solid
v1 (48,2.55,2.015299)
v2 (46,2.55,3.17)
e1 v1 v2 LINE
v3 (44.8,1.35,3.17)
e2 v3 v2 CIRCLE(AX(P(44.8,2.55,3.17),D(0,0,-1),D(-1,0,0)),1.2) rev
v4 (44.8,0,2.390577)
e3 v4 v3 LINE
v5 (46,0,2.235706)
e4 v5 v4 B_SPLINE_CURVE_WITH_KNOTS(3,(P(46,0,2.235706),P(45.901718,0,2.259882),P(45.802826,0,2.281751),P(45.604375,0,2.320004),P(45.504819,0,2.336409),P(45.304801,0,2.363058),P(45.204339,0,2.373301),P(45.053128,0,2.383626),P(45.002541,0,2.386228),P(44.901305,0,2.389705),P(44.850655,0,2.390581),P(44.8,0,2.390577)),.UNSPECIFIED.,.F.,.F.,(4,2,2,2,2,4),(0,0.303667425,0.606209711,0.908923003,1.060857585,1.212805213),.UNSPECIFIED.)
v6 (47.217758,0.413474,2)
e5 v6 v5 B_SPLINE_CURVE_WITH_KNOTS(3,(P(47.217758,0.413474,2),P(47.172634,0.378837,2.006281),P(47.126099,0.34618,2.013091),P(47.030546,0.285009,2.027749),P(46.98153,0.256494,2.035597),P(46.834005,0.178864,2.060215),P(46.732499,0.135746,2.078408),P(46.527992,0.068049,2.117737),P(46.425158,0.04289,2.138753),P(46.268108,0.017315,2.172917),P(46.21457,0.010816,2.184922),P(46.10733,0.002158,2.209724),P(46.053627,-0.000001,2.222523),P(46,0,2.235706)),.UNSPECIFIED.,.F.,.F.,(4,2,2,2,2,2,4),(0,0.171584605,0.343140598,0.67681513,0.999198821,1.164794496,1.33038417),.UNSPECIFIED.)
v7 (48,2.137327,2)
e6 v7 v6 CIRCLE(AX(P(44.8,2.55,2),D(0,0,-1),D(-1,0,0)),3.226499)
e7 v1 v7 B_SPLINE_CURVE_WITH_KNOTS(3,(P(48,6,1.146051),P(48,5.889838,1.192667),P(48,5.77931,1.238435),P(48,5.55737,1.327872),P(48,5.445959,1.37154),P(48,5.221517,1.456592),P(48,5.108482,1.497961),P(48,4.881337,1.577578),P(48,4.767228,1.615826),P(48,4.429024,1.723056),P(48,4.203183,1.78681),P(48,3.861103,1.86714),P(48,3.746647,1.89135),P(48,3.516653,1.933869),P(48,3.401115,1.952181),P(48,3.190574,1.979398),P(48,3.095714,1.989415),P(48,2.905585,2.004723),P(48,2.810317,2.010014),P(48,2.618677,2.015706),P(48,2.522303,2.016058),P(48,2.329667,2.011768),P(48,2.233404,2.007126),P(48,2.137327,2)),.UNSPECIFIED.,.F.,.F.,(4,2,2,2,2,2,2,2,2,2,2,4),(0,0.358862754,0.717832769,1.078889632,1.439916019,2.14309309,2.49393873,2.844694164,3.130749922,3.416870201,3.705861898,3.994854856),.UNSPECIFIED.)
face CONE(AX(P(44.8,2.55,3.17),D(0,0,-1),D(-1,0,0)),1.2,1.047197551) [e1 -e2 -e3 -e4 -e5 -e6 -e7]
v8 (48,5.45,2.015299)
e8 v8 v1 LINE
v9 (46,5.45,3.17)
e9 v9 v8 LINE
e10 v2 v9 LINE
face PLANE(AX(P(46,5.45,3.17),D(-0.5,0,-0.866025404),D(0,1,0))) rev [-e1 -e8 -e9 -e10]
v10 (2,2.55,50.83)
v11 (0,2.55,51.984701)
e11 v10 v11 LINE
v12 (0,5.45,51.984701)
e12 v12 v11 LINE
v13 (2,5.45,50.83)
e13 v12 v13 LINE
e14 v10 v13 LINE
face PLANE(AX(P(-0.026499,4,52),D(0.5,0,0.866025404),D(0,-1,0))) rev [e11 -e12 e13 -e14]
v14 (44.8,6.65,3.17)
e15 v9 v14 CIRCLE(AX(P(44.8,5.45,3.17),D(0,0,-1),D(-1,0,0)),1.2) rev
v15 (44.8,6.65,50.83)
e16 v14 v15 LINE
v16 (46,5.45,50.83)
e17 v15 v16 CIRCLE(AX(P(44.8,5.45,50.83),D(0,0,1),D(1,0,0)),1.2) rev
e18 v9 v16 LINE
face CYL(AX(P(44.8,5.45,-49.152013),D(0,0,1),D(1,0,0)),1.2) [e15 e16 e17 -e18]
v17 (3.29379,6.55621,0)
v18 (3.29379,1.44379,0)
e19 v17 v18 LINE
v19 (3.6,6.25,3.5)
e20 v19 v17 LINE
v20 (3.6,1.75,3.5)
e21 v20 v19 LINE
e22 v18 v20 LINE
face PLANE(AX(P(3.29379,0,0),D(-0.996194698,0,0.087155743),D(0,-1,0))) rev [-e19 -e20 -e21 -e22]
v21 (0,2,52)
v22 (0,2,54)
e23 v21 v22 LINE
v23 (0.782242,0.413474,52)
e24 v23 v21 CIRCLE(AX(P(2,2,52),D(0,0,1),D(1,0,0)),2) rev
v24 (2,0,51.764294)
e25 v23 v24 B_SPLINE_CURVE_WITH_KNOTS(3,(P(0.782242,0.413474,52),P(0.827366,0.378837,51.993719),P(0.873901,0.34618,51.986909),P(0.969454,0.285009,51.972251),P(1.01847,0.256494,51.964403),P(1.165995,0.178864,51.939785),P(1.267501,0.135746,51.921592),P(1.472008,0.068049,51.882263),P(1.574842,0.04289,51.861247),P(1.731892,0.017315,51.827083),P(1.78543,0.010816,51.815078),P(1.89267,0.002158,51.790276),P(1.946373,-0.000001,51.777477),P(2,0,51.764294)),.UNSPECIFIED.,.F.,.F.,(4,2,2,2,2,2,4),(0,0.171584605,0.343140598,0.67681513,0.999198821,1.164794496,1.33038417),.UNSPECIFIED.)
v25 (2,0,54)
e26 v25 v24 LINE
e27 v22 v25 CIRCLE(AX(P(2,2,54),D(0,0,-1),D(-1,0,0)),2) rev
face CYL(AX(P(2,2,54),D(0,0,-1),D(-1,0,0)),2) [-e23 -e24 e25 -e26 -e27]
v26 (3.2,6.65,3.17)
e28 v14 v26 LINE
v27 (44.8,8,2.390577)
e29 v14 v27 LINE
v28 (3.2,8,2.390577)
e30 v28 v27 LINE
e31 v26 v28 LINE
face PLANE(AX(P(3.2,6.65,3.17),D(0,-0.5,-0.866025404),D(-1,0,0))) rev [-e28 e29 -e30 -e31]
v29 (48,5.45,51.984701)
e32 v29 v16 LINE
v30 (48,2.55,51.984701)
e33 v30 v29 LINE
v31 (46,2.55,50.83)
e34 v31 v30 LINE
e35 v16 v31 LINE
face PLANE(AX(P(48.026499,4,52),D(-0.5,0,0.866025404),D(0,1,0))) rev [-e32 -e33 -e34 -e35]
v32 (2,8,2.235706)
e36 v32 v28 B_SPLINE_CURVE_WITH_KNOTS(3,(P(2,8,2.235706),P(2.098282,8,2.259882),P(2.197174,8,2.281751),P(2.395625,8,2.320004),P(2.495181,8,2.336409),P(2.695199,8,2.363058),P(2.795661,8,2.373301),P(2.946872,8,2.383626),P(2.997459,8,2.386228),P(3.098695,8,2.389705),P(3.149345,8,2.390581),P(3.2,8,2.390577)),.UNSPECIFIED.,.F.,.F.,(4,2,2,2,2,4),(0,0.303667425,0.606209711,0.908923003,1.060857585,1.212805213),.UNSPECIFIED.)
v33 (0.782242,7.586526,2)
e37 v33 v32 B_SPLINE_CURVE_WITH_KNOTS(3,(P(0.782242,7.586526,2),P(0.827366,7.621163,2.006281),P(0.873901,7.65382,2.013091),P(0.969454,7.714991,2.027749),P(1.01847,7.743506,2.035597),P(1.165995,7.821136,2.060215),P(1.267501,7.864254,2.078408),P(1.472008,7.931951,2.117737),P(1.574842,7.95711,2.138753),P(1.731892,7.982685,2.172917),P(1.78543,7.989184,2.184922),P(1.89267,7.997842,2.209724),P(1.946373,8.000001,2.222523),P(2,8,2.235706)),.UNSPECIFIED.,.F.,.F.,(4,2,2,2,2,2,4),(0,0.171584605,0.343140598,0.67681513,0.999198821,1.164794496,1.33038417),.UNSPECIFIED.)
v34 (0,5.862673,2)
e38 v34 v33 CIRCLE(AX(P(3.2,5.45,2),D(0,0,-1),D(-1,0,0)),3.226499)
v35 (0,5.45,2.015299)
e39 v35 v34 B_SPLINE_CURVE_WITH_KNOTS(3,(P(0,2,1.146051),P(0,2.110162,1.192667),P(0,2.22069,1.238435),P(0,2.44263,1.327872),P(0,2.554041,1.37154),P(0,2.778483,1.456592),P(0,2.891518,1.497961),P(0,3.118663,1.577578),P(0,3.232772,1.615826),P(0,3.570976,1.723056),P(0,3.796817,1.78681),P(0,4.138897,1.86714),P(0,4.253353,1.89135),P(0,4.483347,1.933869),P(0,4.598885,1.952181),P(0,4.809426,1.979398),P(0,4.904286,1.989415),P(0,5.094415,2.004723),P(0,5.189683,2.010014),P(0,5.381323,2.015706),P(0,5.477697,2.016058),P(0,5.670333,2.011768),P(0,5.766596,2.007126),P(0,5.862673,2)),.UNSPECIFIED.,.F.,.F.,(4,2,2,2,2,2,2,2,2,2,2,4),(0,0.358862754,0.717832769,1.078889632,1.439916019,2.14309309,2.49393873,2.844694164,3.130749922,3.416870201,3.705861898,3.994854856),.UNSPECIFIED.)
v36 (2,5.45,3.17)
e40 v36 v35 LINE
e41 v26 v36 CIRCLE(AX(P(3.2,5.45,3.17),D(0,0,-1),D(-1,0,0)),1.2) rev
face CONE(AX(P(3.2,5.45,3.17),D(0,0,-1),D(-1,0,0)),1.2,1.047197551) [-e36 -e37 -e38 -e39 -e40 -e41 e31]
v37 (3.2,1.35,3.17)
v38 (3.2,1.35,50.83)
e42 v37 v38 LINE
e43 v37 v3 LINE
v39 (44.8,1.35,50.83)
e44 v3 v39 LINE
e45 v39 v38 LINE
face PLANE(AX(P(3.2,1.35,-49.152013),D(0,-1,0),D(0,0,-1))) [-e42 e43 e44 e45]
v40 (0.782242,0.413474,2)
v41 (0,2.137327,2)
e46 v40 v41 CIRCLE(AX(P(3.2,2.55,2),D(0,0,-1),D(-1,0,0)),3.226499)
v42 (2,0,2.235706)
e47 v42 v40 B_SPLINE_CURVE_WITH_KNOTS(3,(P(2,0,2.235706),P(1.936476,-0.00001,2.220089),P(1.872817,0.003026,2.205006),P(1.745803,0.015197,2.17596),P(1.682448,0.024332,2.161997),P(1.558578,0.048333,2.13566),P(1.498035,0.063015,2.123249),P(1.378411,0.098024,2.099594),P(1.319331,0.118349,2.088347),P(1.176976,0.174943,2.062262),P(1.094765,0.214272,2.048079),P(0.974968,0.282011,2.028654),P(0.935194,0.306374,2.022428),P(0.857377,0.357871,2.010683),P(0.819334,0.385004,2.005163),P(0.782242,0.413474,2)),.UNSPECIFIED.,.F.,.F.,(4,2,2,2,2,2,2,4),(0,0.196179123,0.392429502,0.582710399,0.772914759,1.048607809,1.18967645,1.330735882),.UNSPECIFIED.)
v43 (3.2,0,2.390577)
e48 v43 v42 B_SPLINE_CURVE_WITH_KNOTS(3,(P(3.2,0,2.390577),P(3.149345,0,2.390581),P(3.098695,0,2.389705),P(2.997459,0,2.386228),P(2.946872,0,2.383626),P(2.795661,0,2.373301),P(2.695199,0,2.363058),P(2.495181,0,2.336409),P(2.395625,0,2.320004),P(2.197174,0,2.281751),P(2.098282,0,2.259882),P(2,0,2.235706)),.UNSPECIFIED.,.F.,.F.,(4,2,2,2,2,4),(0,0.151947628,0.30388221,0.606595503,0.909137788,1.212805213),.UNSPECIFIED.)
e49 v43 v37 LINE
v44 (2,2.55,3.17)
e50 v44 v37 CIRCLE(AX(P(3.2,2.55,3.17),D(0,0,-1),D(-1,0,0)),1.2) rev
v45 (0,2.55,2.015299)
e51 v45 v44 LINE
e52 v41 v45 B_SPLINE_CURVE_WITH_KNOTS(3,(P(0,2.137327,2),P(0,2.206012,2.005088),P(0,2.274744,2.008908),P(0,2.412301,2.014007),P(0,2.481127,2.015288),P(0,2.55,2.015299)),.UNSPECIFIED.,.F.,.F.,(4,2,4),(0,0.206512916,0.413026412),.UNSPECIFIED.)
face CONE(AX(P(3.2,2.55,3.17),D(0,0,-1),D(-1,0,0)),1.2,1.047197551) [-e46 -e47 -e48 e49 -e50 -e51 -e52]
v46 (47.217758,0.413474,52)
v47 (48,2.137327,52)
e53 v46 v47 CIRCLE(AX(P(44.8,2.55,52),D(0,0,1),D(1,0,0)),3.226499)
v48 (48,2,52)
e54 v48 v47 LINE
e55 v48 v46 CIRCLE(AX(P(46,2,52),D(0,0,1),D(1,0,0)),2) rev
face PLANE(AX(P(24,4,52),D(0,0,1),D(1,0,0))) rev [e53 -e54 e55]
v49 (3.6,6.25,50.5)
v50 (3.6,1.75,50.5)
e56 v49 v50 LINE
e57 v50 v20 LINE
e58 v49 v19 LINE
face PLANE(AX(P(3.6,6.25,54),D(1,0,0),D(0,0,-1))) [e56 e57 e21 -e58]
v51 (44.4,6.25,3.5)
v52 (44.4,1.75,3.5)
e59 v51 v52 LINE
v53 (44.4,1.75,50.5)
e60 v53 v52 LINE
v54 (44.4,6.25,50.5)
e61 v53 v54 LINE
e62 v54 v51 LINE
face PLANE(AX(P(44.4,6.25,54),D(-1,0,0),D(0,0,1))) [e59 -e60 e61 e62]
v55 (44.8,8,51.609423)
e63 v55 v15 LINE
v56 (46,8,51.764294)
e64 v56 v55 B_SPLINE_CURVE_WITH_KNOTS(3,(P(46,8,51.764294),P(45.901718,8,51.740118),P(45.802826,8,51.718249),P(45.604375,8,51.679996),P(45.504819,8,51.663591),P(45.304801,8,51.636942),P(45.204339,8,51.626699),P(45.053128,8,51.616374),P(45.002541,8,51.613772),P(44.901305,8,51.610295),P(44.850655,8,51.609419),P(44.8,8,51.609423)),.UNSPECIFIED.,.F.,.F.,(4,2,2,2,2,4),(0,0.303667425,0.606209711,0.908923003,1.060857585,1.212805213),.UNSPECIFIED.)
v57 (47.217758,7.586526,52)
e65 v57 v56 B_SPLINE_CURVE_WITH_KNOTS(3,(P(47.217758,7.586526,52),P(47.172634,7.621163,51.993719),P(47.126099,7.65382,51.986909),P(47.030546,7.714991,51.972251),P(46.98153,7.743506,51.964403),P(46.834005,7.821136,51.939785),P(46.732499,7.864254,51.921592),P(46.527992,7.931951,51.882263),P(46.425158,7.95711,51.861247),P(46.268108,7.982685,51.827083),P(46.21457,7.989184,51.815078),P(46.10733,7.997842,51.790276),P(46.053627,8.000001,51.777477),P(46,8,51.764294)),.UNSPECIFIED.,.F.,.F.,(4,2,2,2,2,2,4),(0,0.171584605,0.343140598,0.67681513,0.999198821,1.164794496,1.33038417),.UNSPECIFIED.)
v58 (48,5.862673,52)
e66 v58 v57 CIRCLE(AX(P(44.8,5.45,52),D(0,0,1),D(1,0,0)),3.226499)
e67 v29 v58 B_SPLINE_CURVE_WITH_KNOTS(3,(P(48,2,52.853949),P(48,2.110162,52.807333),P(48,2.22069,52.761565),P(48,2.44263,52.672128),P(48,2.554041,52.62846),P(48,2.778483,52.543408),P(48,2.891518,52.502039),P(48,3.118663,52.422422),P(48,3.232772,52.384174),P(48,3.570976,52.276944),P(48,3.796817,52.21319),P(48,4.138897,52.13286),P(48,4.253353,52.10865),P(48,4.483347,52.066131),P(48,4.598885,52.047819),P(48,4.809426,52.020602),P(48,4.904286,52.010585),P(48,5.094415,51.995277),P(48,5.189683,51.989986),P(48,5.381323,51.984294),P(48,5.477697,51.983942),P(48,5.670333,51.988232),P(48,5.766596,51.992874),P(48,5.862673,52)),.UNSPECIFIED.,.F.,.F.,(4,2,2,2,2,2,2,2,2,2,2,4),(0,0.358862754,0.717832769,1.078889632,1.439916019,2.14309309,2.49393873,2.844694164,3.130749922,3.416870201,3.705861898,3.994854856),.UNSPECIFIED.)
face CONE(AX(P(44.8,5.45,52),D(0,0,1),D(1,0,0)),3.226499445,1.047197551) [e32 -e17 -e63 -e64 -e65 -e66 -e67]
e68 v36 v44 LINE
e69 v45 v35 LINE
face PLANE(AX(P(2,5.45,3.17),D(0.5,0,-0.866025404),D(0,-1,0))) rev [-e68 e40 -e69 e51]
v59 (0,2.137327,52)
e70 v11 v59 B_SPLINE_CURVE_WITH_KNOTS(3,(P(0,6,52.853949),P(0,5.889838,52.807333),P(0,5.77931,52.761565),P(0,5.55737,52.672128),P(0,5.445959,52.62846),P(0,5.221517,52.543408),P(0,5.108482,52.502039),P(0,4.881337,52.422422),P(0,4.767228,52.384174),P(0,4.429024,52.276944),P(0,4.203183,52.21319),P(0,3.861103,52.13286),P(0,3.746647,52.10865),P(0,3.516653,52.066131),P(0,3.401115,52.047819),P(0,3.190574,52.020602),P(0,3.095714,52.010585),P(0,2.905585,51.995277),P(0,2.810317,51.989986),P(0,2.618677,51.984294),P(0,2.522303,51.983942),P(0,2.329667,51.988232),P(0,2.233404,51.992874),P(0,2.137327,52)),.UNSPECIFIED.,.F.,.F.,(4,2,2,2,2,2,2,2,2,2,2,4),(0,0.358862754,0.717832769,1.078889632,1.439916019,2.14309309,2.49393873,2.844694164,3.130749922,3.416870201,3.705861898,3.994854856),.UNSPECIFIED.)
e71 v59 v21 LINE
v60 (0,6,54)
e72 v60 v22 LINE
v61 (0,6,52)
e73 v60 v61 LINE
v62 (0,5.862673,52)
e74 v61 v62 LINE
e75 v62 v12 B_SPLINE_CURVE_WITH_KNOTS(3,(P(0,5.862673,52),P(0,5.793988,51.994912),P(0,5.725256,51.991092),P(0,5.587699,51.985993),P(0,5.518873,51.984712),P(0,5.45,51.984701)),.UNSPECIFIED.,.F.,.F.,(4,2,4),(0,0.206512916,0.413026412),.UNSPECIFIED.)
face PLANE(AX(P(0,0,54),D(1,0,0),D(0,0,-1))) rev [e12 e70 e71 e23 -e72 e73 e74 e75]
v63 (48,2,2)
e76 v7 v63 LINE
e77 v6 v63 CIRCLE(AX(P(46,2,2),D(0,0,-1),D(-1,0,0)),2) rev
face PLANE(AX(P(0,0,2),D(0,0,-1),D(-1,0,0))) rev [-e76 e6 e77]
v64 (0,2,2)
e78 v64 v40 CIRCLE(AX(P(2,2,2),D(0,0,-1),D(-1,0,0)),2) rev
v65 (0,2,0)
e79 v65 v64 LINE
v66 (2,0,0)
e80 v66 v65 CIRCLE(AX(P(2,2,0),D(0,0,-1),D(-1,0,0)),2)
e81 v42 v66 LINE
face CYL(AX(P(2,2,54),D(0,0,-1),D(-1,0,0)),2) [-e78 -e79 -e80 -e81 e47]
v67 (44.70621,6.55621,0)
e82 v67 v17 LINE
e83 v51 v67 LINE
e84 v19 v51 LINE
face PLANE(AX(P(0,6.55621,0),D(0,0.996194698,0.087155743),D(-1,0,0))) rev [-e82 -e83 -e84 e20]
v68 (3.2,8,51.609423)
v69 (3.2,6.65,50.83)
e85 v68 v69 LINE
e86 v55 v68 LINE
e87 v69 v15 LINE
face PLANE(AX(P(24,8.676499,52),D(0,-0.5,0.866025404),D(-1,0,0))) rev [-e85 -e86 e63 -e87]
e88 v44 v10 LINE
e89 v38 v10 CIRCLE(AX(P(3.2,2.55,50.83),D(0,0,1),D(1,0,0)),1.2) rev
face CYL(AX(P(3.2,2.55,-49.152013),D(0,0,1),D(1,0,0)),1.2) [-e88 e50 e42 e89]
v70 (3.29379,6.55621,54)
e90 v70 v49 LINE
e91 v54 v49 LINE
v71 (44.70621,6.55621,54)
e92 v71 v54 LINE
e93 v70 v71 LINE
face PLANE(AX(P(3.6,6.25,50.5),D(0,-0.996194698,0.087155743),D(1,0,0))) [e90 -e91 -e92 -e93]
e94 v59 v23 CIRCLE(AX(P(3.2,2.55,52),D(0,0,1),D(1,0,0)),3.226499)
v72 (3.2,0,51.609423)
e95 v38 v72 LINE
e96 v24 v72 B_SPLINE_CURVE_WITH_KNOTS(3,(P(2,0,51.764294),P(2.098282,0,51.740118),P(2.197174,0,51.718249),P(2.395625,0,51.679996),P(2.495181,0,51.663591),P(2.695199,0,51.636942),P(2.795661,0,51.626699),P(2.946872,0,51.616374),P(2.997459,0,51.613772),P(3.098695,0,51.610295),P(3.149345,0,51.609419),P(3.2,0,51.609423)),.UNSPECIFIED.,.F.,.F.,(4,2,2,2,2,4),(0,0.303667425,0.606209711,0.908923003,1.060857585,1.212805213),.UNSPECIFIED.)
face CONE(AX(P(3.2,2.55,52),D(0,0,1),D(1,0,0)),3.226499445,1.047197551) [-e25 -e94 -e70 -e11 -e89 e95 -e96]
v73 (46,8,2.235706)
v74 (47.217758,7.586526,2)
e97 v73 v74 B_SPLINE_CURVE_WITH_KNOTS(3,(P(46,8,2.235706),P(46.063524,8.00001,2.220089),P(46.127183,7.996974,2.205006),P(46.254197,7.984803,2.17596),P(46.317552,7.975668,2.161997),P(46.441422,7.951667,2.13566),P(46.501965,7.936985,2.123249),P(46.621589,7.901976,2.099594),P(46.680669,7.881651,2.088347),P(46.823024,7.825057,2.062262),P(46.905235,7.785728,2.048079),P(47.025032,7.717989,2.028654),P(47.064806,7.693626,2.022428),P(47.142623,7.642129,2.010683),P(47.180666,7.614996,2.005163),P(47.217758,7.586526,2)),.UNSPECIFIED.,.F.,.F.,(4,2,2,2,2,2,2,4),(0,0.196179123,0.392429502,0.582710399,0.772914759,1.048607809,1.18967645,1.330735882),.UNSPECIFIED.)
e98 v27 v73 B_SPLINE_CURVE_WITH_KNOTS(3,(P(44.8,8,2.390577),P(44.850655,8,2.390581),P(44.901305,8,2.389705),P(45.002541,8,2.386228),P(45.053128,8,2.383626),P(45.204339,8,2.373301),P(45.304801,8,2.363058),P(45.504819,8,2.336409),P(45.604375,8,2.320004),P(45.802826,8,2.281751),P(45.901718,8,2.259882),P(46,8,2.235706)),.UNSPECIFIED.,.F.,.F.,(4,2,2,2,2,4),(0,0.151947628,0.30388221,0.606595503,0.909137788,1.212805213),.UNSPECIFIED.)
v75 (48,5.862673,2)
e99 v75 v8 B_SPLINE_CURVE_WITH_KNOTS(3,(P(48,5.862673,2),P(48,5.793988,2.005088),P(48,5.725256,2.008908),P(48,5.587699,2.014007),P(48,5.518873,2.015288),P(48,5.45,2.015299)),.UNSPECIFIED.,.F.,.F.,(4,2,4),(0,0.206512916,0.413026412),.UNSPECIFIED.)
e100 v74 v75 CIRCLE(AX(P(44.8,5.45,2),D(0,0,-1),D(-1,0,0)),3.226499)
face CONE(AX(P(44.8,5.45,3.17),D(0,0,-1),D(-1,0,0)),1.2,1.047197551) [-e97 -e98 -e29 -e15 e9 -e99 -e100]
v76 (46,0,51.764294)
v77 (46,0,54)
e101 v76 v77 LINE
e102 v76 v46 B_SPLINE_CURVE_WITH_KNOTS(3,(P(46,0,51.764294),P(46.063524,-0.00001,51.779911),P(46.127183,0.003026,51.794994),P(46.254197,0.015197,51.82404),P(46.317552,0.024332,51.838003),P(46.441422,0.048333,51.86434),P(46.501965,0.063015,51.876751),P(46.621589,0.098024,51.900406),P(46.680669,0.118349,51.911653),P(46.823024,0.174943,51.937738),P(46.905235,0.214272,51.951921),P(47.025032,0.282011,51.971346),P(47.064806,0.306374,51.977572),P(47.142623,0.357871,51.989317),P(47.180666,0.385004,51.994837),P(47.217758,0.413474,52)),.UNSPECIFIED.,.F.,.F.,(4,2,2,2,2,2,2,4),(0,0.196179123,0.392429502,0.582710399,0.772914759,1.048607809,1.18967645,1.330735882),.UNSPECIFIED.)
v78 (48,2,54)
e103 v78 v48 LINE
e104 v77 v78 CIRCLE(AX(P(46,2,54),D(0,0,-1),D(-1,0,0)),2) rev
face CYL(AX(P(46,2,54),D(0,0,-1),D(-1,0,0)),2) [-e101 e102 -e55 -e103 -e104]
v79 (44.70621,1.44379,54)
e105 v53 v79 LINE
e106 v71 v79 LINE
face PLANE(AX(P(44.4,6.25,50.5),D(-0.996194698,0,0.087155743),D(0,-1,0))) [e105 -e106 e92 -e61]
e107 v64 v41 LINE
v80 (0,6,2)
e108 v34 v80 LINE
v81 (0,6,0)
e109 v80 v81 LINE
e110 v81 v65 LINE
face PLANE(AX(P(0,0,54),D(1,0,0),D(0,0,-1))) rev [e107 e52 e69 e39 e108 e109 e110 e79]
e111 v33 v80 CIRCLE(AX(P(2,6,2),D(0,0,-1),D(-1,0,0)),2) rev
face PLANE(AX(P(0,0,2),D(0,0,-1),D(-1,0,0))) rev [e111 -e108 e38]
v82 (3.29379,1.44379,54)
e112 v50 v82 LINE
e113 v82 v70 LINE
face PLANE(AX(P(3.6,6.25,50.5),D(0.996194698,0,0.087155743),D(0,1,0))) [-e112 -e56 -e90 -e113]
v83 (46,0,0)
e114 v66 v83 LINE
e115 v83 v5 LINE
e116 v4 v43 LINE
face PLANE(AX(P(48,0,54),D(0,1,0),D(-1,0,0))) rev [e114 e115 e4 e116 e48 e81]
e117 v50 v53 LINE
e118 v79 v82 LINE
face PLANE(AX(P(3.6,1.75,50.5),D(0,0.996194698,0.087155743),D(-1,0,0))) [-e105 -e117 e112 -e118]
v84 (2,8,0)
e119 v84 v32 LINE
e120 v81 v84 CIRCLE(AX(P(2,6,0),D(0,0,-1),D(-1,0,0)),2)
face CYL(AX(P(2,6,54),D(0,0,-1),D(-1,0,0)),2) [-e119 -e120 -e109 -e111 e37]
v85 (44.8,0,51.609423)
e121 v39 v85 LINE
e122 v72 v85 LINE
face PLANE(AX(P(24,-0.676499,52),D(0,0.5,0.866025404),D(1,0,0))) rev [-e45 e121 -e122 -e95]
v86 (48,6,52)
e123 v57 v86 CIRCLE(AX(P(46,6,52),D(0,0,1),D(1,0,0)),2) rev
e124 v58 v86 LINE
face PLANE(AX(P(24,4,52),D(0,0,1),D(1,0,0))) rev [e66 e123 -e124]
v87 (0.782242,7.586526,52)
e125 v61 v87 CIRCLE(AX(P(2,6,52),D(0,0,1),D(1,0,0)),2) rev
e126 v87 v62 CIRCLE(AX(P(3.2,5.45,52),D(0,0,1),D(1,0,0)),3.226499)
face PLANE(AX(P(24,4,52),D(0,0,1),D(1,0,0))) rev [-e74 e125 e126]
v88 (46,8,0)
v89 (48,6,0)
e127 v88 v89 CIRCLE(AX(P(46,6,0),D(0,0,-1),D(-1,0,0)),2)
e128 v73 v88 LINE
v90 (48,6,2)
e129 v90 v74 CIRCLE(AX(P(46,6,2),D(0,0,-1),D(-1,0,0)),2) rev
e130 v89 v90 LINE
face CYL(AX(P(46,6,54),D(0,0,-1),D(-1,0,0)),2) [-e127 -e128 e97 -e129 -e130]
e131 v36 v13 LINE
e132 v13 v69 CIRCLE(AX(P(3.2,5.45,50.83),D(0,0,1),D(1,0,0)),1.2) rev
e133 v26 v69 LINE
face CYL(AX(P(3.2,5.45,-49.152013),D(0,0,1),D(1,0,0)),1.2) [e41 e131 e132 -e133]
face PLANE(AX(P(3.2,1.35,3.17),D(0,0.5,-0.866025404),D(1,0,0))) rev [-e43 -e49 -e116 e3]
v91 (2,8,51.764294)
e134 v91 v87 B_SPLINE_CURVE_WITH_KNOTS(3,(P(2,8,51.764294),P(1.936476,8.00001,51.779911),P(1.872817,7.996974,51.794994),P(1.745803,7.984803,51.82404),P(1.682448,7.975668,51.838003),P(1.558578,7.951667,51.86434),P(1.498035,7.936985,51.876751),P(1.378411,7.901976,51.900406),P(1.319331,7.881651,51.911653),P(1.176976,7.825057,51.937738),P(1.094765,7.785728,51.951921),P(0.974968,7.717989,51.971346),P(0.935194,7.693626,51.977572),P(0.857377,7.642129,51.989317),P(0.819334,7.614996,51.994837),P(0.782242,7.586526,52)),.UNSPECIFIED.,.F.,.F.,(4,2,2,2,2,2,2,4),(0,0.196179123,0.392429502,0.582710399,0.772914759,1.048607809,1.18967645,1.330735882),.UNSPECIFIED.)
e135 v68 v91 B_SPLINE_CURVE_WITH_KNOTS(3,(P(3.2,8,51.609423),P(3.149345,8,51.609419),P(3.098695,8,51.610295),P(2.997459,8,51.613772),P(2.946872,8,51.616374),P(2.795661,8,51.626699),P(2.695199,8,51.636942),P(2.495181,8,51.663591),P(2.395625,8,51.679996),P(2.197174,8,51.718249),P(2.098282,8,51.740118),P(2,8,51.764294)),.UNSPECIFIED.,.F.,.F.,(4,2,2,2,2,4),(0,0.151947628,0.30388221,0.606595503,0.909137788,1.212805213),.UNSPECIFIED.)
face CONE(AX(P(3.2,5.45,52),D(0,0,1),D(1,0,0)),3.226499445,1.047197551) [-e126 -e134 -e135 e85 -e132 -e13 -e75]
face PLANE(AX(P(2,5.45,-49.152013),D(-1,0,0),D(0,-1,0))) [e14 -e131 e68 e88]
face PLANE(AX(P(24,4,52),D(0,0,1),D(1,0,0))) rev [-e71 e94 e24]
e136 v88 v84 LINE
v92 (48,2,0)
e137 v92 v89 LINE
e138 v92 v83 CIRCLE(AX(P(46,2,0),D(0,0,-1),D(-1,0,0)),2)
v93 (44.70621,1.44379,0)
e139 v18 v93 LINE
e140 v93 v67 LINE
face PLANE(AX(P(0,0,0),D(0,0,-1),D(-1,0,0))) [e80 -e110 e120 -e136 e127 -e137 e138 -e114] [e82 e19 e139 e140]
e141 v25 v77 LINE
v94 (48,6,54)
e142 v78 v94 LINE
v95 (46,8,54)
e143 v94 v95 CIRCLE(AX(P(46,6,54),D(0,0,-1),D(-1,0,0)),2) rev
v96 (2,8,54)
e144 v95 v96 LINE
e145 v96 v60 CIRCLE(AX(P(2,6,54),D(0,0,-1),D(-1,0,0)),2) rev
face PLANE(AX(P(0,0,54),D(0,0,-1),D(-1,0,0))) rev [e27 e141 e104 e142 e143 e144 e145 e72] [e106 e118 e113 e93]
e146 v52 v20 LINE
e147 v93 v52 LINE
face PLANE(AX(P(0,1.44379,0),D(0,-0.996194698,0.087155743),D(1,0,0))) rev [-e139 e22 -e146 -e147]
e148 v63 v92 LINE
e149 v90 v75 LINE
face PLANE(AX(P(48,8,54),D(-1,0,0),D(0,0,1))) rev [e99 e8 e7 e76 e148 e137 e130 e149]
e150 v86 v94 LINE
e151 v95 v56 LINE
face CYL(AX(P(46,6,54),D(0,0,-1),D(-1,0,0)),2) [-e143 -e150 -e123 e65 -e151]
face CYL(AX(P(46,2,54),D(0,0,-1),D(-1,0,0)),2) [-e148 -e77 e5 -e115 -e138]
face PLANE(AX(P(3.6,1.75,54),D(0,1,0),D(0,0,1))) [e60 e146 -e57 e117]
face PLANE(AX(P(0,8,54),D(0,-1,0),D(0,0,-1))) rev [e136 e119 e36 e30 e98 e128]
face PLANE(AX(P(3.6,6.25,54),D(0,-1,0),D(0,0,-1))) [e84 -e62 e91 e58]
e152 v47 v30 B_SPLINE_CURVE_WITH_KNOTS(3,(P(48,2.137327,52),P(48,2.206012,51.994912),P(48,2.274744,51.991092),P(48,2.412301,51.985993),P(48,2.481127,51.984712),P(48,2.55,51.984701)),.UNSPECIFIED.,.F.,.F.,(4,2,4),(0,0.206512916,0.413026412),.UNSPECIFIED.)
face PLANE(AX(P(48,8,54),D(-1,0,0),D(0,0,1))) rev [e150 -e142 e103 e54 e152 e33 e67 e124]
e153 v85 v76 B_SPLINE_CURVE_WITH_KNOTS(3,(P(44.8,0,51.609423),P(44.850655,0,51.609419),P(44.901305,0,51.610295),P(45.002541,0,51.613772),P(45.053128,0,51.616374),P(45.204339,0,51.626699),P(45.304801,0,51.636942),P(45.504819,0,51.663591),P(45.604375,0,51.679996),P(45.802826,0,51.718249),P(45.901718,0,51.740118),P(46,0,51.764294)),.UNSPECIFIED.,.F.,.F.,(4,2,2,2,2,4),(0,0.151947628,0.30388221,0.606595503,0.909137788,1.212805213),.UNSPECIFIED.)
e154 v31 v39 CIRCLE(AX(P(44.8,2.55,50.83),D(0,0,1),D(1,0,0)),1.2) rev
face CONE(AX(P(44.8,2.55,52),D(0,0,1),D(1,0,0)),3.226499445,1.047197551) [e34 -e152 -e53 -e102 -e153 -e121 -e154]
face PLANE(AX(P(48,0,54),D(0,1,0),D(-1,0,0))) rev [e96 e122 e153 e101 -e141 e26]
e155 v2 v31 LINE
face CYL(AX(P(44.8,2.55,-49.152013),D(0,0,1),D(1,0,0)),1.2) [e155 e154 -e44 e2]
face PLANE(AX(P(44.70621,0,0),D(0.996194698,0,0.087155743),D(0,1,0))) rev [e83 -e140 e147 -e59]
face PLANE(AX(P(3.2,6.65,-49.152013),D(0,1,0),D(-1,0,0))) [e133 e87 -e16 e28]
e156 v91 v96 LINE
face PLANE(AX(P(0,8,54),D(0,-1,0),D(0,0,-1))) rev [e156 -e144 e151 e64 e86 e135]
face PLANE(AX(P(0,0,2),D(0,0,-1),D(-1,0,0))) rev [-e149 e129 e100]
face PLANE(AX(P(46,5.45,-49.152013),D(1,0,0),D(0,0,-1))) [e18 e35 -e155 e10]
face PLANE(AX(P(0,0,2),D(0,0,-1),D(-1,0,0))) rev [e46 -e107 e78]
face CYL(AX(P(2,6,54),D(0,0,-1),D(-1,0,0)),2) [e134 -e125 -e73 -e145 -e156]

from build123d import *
from OCP.BRepFilletAPI import BRepFilletAPI_MakeChamfer

# Parameters (mm, degrees)
SKETCH1_W           = 48
SKETCH1_H           = 8
SKETCH1_W_2         = 40.8
SKETCH1_H_2         = 4.5
BOSS_EXTRUDE1_DEPTH = 54
CUT_EXTRUDE1_START  = -2
SKETCH2_OUTSIDE_W   = 64.538
SKETCH2_OUTSIDE_H   = 24.538
CUT_EXTRUDE1_DEPTH  = 50
FILLET1_R           = 2
CHAMFER4_SIZE       = 1.17
CHAMFER4_SIZE_2     = 2.026499445
CHAMFER5_SIZE       = 3.5
CHAMFER5_SIZE2      = 0.306210322


with BuildPart() as part:
    # Sketch1 → Boss-Extrude1 (new body)
    with BuildSketch(Plane.XY):
        with Locations((24, 4)):
            Rectangle(SKETCH1_W, SKETCH1_H)
        with Locations((24, 4)):
            Rectangle(SKETCH1_W_2, SKETCH1_H_2, mode=Mode.SUBTRACT)
    extrude(amount=BOSS_EXTRUDE1_DEPTH)

    # Sketch2 outside → Cut-Extrude1 (cut)
    with BuildSketch(Plane.XY.offset(54).offset(CUT_EXTRUDE1_START)):
        with Locations((24, 4)):
            Rectangle(SKETCH2_OUTSIDE_W, SKETCH2_OUTSIDE_H)
        with BuildLine():
            Line((3.2, 6.65), (44.8, 6.65))
            ThreePointArc((44.8, 6.65), (45.648528137, 6.298528137), (46, 5.45))
            Line((46, 5.45), (46, 2.55))
            ThreePointArc((46, 2.55), (45.648528137, 1.701471863), (44.8, 1.35))
            Line((44.8, 1.35), (3.2, 1.35))
            ThreePointArc((3.2, 1.35), (2.351471863, 1.701471863), (2, 2.55))
            Line((2, 2.55), (2, 5.45))
            ThreePointArc((2, 5.45), (2.351471863, 6.298528137), (3.2, 6.65))
        make_face(mode=Mode.SUBTRACT)
    extrude(amount=-CUT_EXTRUDE1_DEPTH, mode=Mode.SUBTRACT)

    # Fillet1
    fillet1_edges = [part.edges().sort_by_distance(p)[0] for p in [
        (48, 0, 1),
        (0, 0, 1),
        (0, 8, 1),
        (48, 8, 1),
        (48, 0, 53),
        (0, 0, 53),
        (0, 8, 53),
        (48, 8, 53),
    ]]
    fillet(fillet1_edges, radius=FILLET1_R)

    # Chamfer4
    # the kernel refuses this chamfer: 2.026499445, 1.17 mm, written as the material it adds along each edge
    with BuildSketch(Plane(origin=(2, 2.55, 52), x_dir=(0.05789386240267108, 0, -0.9983227437537927), z_dir=(0, 1, 0))) as chamfer4_piece_1_section:
        Polygon((CHAMFER4_SIZE * 0.998322743754, CHAMFER4_SIZE * 0.0578938624027), (-CHAMFER4_SIZE_2 * 0.0578938623985, CHAMFER4_SIZE_2 * 0.998322743683), (0, 0), align=None)
    chamfer4_piece_1 = extrude(amount=2.9, mode=Mode.PRIVATE)
    chamfer4_piece_1 = split(chamfer4_piece_1, bisect_by=Plane(origin=(0, 4, 51.609934173), z_dir=(1, 0, 0)), keep=Keep.TOP, mode=Mode.PRIVATE)
    add(chamfer4_piece_1)
    with BuildSketch(Plane(origin=(2, 2.55, 2), x_dir=(-0.999813220622208, 0, -0.019326765612700622), z_dir=(0, 1, 0))) as chamfer4_piece_2_section:
        Polygon((CHAMFER4_SIZE_2 * 0.999813220551, CHAMFER4_SIZE_2 * 0.0193267656113), (-CHAMFER4_SIZE * 0.0193267656127, CHAMFER4_SIZE * 0.999813220622), (0, 0), align=None)
    chamfer4_piece_2 = extrude(amount=2.9, mode=Mode.PRIVATE)
    chamfer4_piece_2 = split(chamfer4_piece_2, bisect_by=Plane(origin=(0, 4, 2.390065827), z_dir=(1, 0, 0)), keep=Keep.TOP, mode=Mode.PRIVATE)
    add(chamfer4_piece_2)
    with BuildSketch(Plane(origin=(3.2, 2.55, 52), x_dir=(0, -1, 0), z_dir=(1, 0, 0))) as chamfer4_piece_3_section:
        Polygon((1.2, CHAMFER4_SIZE), (1.2 + CHAMFER4_SIZE_2, 0), (1.2, 0), align=None)
    chamfer4_piece_3 = revolve(axis=Axis((3.2, 2.55, 52), (0, 0, -1)), revolution_arc=90, mode=Mode.PRIVATE)
    chamfer4_piece_3 = chamfer4_piece_3 & Plane(origin=(2, 2, 51.456530792), x_dir=(0, -1, 0), z_dir=(0, 0, 1)) * Cylinder(2, 13, mode=Mode.PRIVATE)
    add(chamfer4_piece_3)
    with BuildSketch(Plane(origin=(3.2, 2.55, 52), x_dir=(0, -1, 0), z_dir=(1, 0, 0))) as chamfer4_piece_4_section:
        Polygon((1.2, CHAMFER4_SIZE), (1.2 + CHAMFER4_SIZE_2, 0), (1.2, 0), align=None)
    chamfer4_piece_4 = revolve(axis=Axis((3.2, 2.55, 52), (0, 0, -1)), revolution_arc=90, mode=Mode.PRIVATE)
    chamfer4_piece_4 = split(chamfer4_piece_4, bisect_by=Plane(origin=(2, 0.130683468, 51.773765117), z_dir=(1, 0, 0)), keep=Keep.TOP, mode=Mode.PRIVATE)
    chamfer4_piece_4 = split(chamfer4_piece_4, bisect_by=Plane(origin=(2.932508476, 0, 51.773765117), z_dir=(0, 1, 0)), keep=Keep.TOP, mode=Mode.PRIVATE)
    add(chamfer4_piece_4)
    with BuildSketch(Plane(origin=(3.2, 2.55, 52), x_dir=(0, -1, 0), z_dir=(1, 0, 0))) as chamfer4_piece_5_section:
        Polygon((1.2, CHAMFER4_SIZE), (1.2 + CHAMFER4_SIZE_2, 0), (1.2, 0), align=None)
    chamfer4_piece_5 = revolve(axis=Axis((3.2, 2.55, 52), (0, 0, -1)), revolution_arc=90, mode=Mode.PRIVATE)
    chamfer4_piece_5 = split(chamfer4_piece_5, bisect_by=Plane(origin=(0.031272967, 1.35, 51.984062188), z_dir=(0, 1, 0)), keep=Keep.TOP, mode=Mode.PRIVATE)
    chamfer4_piece_5 = split(chamfer4_piece_5, bisect_by=Plane(origin=(0, 2.450571478, 51.984062188), z_dir=(1, 0, 0)), keep=Keep.TOP, mode=Mode.PRIVATE)
    add(chamfer4_piece_5)
    with BuildSketch(Plane(origin=(3.2, 2.55, 2), x_dir=(0, -1, 0), z_dir=(1, 0, 0))) as chamfer4_piece_6_section:
        Polygon((1.2 + CHAMFER4_SIZE_2, 0), (1.2, -CHAMFER4_SIZE), (1.2, 0), align=None)
    chamfer4_piece_6 = revolve(axis=Axis((3.2, 2.55, 2), (0, 0, -1)), revolution_arc=90, mode=Mode.PRIVATE)
    chamfer4_piece_6 = split(chamfer4_piece_6, bisect_by=Plane(origin=(2.932508484, 0, 2.226234886), z_dir=(0, 1, 0)), keep=Keep.TOP, mode=Mode.PRIVATE)
    chamfer4_piece_6 = split(chamfer4_piece_6, bisect_by=Plane(origin=(2, 0.130683471, 2.226234886), z_dir=(1, 0, 0)), keep=Keep.TOP, mode=Mode.PRIVATE)
    add(chamfer4_piece_6)
    with BuildSketch(Plane(origin=(3.2, 2.55, 2), x_dir=(0, -1, 0), z_dir=(1, 0, 0))) as chamfer4_piece_7_section:
        Polygon((1.2 + CHAMFER4_SIZE_2, 0), (1.2, -CHAMFER4_SIZE), (1.2, 0), align=None)
    chamfer4_piece_7 = revolve(axis=Axis((3.2, 2.55, 2), (0, 0, -1)), revolution_arc=90, mode=Mode.PRIVATE)
    chamfer4_piece_7 = chamfer4_piece_7 & Plane(origin=(2, 2, 2.22929574), x_dir=(-1, 0, 0), z_dir=(0, 0, 1)) * Cylinder(2, 13, mode=Mode.PRIVATE)
    add(chamfer4_piece_7)
    with BuildSketch(Plane(origin=(3.2, 2.55, 2), x_dir=(0, -1, 0), z_dir=(1, 0, 0))) as chamfer4_piece_8_section:
        Polygon((1.2 + CHAMFER4_SIZE_2, 0), (1.2, -CHAMFER4_SIZE), (1.2, 0), align=None)
    chamfer4_piece_8 = revolve(axis=Axis((3.2, 2.55, 2), (0, 0, -1)), revolution_arc=90, mode=Mode.PRIVATE)
    chamfer4_piece_8 = split(chamfer4_piece_8, bisect_by=Plane(origin=(0, 2.450571478, 2.015937812), z_dir=(1, 0, 0)), keep=Keep.TOP, mode=Mode.PRIVATE)
    chamfer4_piece_8 = split(chamfer4_piece_8, bisect_by=Plane(origin=(0.031272967, 1.35, 2.015937812), z_dir=(0, 1, 0)), keep=Keep.TOP, mode=Mode.PRIVATE)
    add(chamfer4_piece_8)
    with BuildSketch(Plane(origin=(3.2, 5.45, 52), x_dir=(-1, 0, 0), z_dir=(0, -1, 0))) as chamfer4_piece_9_section:
        Polygon((1.2, CHAMFER4_SIZE), (1.2 + CHAMFER4_SIZE_2, 0), (1.2, 0), align=None)
    chamfer4_piece_9 = revolve(axis=Axis((3.2, 5.45, 52), (0, 0, -1)), revolution_arc=90, mode=Mode.PRIVATE)
    chamfer4_piece_9 = chamfer4_piece_9 & Plane(origin=(2, 6, 51.456530792), x_dir=(0, 1, 0), z_dir=(0, 0, 1)) * Cylinder(2, 13, mode=Mode.PRIVATE)
    add(chamfer4_piece_9)
    with BuildSketch(Plane(origin=(3.2, 5.45, 52), x_dir=(-1, 0, 0), z_dir=(0, -1, 0))) as chamfer4_piece_10_section:
        Polygon((1.2, CHAMFER4_SIZE), (1.2 + CHAMFER4_SIZE_2, 0), (1.2, 0), align=None)
    chamfer4_piece_10 = revolve(axis=Axis((3.2, 5.45, 52), (0, 0, -1)), revolution_arc=90, mode=Mode.PRIVATE)
    chamfer4_piece_10 = split(chamfer4_piece_10, bisect_by=Plane(origin=(0.031272967, 6.65, 51.984062188), z_dir=(0, -1, 0)), keep=Keep.TOP, mode=Mode.PRIVATE)
    chamfer4_piece_10 = split(chamfer4_piece_10, bisect_by=Plane(origin=(0, 5.549428522, 51.984062188), z_dir=(1, 0, 0)), keep=Keep.TOP, mode=Mode.PRIVATE)
    add(chamfer4_piece_10)
    with BuildSketch(Plane(origin=(3.2, 5.45, 52), x_dir=(-1, 0, 0), z_dir=(0, -1, 0))) as chamfer4_piece_11_section:
        Polygon((1.2, CHAMFER4_SIZE), (1.2 + CHAMFER4_SIZE_2, 0), (1.2, 0), align=None)
    chamfer4_piece_11 = revolve(axis=Axis((3.2, 5.45, 52), (0, 0, -1)), revolution_arc=90, mode=Mode.PRIVATE)
    chamfer4_piece_11 = split(chamfer4_piece_11, bisect_by=Plane(origin=(2, 7.869316535, 51.773765118), z_dir=(1, 0, 0)), keep=Keep.TOP, mode=Mode.PRIVATE)
    chamfer4_piece_11 = split(chamfer4_piece_11, bisect_by=Plane(origin=(2.932508473, 8, 51.773765118), z_dir=(0, -1, 0)), keep=Keep.TOP, mode=Mode.PRIVATE)
    add(chamfer4_piece_11)
    with BuildSketch(Plane(origin=(3.2, 5.45, 2), x_dir=(-1, 0, 0), z_dir=(0, -1, 0))) as chamfer4_piece_12_section:
        Polygon((1.2 + CHAMFER4_SIZE_2, 0), (1.2, -CHAMFER4_SIZE), (1.2, 0), align=None)
    chamfer4_piece_12 = revolve(axis=Axis((3.2, 5.45, 2), (0, 0, -1)), revolution_arc=90, mode=Mode.PRIVATE)
    chamfer4_piece_12 = split(chamfer4_piece_12, bisect_by=Plane(origin=(0, 5.549428522, 2.015937812), z_dir=(1, 0, 0)), keep=Keep.TOP, mode=Mode.PRIVATE)
    chamfer4_piece_12 = split(chamfer4_piece_12, bisect_by=Plane(origin=(0.031272967, 6.65, 2.015937812), z_dir=(0, -1, 0)), keep=Keep.TOP, mode=Mode.PRIVATE)
    add(chamfer4_piece_12)
    with BuildSketch(Plane(origin=(3.2, 5.45, 2), x_dir=(-1, 0, 0), z_dir=(0, -1, 0))) as chamfer4_piece_13_section:
        Polygon((1.2 + CHAMFER4_SIZE_2, 0), (1.2, -CHAMFER4_SIZE), (1.2, 0), align=None)
    chamfer4_piece_13 = revolve(axis=Axis((3.2, 5.45, 2), (0, 0, -1)), revolution_arc=90, mode=Mode.PRIVATE)
    chamfer4_piece_13 = chamfer4_piece_13 & Plane(origin=(2, 6, 2.22929574), x_dir=(0, 1, 0), z_dir=(0, 0, 1)) * Cylinder(2, 13, mode=Mode.PRIVATE)
    add(chamfer4_piece_13)
    with BuildSketch(Plane(origin=(3.2, 5.45, 2), x_dir=(-1, 0, 0), z_dir=(0, -1, 0))) as chamfer4_piece_14_section:
        Polygon((1.2 + CHAMFER4_SIZE_2, 0), (1.2, -CHAMFER4_SIZE), (1.2, 0), align=None)
    chamfer4_piece_14 = revolve(axis=Axis((3.2, 5.45, 2), (0, 0, -1)), revolution_arc=90, mode=Mode.PRIVATE)
    chamfer4_piece_14 = split(chamfer4_piece_14, bisect_by=Plane(origin=(2.932508473, 8, 2.226234882), z_dir=(0, -1, 0)), keep=Keep.TOP, mode=Mode.PRIVATE)
    chamfer4_piece_14 = split(chamfer4_piece_14, bisect_by=Plane(origin=(2, 7.869316535, 2.226234882), z_dir=(1, 0, 0)), keep=Keep.TOP, mode=Mode.PRIVATE)
    add(chamfer4_piece_14)
    with BuildSketch(Plane(origin=(44.8, 1.35, 52), x_dir=(0, 0.05789386240267127, -0.9983227437537927), z_dir=(-1, 0, 0))) as chamfer4_piece_15_section:
        Polygon((CHAMFER4_SIZE * 0.998322743754, CHAMFER4_SIZE * 0.0578938624027), (-CHAMFER4_SIZE_2 * 0.0578938623985, CHAMFER4_SIZE_2 * 0.998322743683), (0, 0), align=None)
    chamfer4_piece_15 = extrude(amount=41.6, mode=Mode.PRIVATE)
    chamfer4_piece_15 = split(chamfer4_piece_15, bisect_by=Plane(origin=(24, 0, 51.577415794), z_dir=(0, 1, 0)), keep=Keep.TOP, mode=Mode.PRIVATE)
    add(chamfer4_piece_15)
    with BuildSketch(Plane(origin=(44.8, 1.35, 2), x_dir=(0, -0.999813220622208, -0.019326765612700633), z_dir=(-1, 0, 0))) as chamfer4_piece_16_section:
        Polygon((CHAMFER4_SIZE_2 * 0.999813220551, CHAMFER4_SIZE_2 * 0.0193267656113), (-CHAMFER4_SIZE * 0.0193267656127, CHAMFER4_SIZE * 0.999813220622), (0, 0), align=None)
    chamfer4_piece_16 = extrude(amount=41.6, mode=Mode.PRIVATE)
    chamfer4_piece_16 = split(chamfer4_piece_16, bisect_by=Plane(origin=(24, 0, 2.422584206), z_dir=(0, 1, 0)), keep=Keep.TOP, mode=Mode.PRIVATE)
    add(chamfer4_piece_16)
    with BuildSketch(Plane(origin=(3.2, 6.65, 52), x_dir=(0, -0.05789386240267145, -0.9983227437537927), z_dir=(1, 0, 0))) as chamfer4_piece_17_section:
        Polygon((CHAMFER4_SIZE * 0.998322743754, CHAMFER4_SIZE * 0.0578938624027), (-CHAMFER4_SIZE_2 * 0.0578938623985, CHAMFER4_SIZE_2 * 0.998322743683), (0, 0), align=None)
    chamfer4_piece_17 = extrude(amount=41.6, mode=Mode.PRIVATE)
    chamfer4_piece_17 = split(chamfer4_piece_17, bisect_by=Plane(origin=(24, 8, 51.577415794), z_dir=(0, -1, 0)), keep=Keep.TOP, mode=Mode.PRIVATE)
    add(chamfer4_piece_17)
    with BuildSketch(Plane(origin=(3.2, 6.65, 2), x_dir=(0, 0.999813220622208, -0.019326765612700633), z_dir=(1, 0, 0))) as chamfer4_piece_18_section:
        Polygon((CHAMFER4_SIZE_2 * 0.999813220551, CHAMFER4_SIZE_2 * 0.0193267656113), (-CHAMFER4_SIZE * 0.0193267656127, CHAMFER4_SIZE * 0.999813220622), (0, 0), align=None)
    chamfer4_piece_18 = extrude(amount=41.6, mode=Mode.PRIVATE)
    chamfer4_piece_18 = split(chamfer4_piece_18, bisect_by=Plane(origin=(24, 8, 2.422584206), z_dir=(0, -1, 0)), keep=Keep.TOP, mode=Mode.PRIVATE)
    add(chamfer4_piece_18)
    with BuildSketch(Plane(origin=(44.8, 2.55, 52), x_dir=(1, 0, 0), z_dir=(0, 1, 0))) as chamfer4_piece_19_section:
        Polygon((1.2, CHAMFER4_SIZE), (1.2 + CHAMFER4_SIZE_2, 0), (1.2, 0), align=None)
    chamfer4_piece_19 = revolve(axis=Axis((44.8, 2.55, 52), (0, 0, -1)), revolution_arc=90, mode=Mode.PRIVATE)
    chamfer4_piece_19 = chamfer4_piece_19 & Plane(origin=(46, 2, 51.456530792), x_dir=(1, 0, 0), z_dir=(0, 0, 1)) * Cylinder(2, 13, mode=Mode.PRIVATE)
    add(chamfer4_piece_19)
    with BuildSketch(Plane(origin=(44.8, 2.55, 52), x_dir=(1, 0, 0), z_dir=(0, 1, 0))) as chamfer4_piece_20_section:
        Polygon((1.2, CHAMFER4_SIZE), (1.2 + CHAMFER4_SIZE_2, 0), (1.2, 0), align=None)
    chamfer4_piece_20 = revolve(axis=Axis((44.8, 2.55, 52), (0, 0, -1)), revolution_arc=90, mode=Mode.PRIVATE)
    chamfer4_piece_20 = split(chamfer4_piece_20, bisect_by=Plane(origin=(47.968727033, 1.35, 51.984062188), z_dir=(0, 1, 0)), keep=Keep.TOP, mode=Mode.PRIVATE)
    chamfer4_piece_20 = split(chamfer4_piece_20, bisect_by=Plane(origin=(48, 2.450571478, 51.984062188), z_dir=(-1, 0, 0)), keep=Keep.TOP, mode=Mode.PRIVATE)
    add(chamfer4_piece_20)
    with BuildSketch(Plane(origin=(44.8, 2.55, 52), x_dir=(1, 0, 0), z_dir=(0, 1, 0))) as chamfer4_piece_21_section:
        Polygon((1.2, CHAMFER4_SIZE), (1.2 + CHAMFER4_SIZE_2, 0), (1.2, 0), align=None)
    chamfer4_piece_21 = revolve(axis=Axis((44.8, 2.55, 52), (0, 0, -1)), revolution_arc=90, mode=Mode.PRIVATE)
    chamfer4_piece_21 = split(chamfer4_piece_21, bisect_by=Plane(origin=(46, 0.130683468, 51.773765114), z_dir=(-1, 0, 0)), keep=Keep.TOP, mode=Mode.PRIVATE)
    chamfer4_piece_21 = split(chamfer4_piece_21, bisect_by=Plane(origin=(45.067491519, 0, 51.773765114), z_dir=(0, 1, 0)), keep=Keep.TOP, mode=Mode.PRIVATE)
    add(chamfer4_piece_21)
    with BuildSketch(Plane(origin=(44.8, 2.55, 2), x_dir=(1, 0, 0), z_dir=(0, 1, 0))) as chamfer4_piece_22_section:
        Polygon((1.2 + CHAMFER4_SIZE_2, 0), (1.2, -CHAMFER4_SIZE), (1.2, 0), align=None)
    chamfer4_piece_22 = revolve(axis=Axis((44.8, 2.55, 2), (0, 0, -1)), revolution_arc=90, mode=Mode.PRIVATE)
    chamfer4_piece_22 = split(chamfer4_piece_22, bisect_by=Plane(origin=(48, 2.450571478, 2.015937812), z_dir=(-1, 0, 0)), keep=Keep.TOP, mode=Mode.PRIVATE)
    chamfer4_piece_22 = split(chamfer4_piece_22, bisect_by=Plane(origin=(47.968727033, 1.35, 2.015937812), z_dir=(0, 1, 0)), keep=Keep.TOP, mode=Mode.PRIVATE)
    add(chamfer4_piece_22)
    with BuildSketch(Plane(origin=(44.8, 2.55, 2), x_dir=(1, 0, 0), z_dir=(0, 1, 0))) as chamfer4_piece_23_section:
        Polygon((1.2 + CHAMFER4_SIZE_2, 0), (1.2, -CHAMFER4_SIZE), (1.2, 0), align=None)
    chamfer4_piece_23 = revolve(axis=Axis((44.8, 2.55, 2), (0, 0, -1)), revolution_arc=90, mode=Mode.PRIVATE)
    chamfer4_piece_23 = chamfer4_piece_23 & Plane(origin=(46, 2, 2.22929574), x_dir=(1, 0, 0), z_dir=(0, 0, 1)) * Cylinder(2, 13, mode=Mode.PRIVATE)
    add(chamfer4_piece_23)
    with BuildSketch(Plane(origin=(44.8, 2.55, 2), x_dir=(1, 0, 0), z_dir=(0, 1, 0))) as chamfer4_piece_24_section:
        Polygon((1.2 + CHAMFER4_SIZE_2, 0), (1.2, -CHAMFER4_SIZE), (1.2, 0), align=None)
    chamfer4_piece_24 = revolve(axis=Axis((44.8, 2.55, 2), (0, 0, -1)), revolution_arc=90, mode=Mode.PRIVATE)
    chamfer4_piece_24 = split(chamfer4_piece_24, bisect_by=Plane(origin=(45.067491519, 0, 2.226234886), z_dir=(0, 1, 0)), keep=Keep.TOP, mode=Mode.PRIVATE)
    chamfer4_piece_24 = split(chamfer4_piece_24, bisect_by=Plane(origin=(46, 0.130683468, 2.226234886), z_dir=(-1, 0, 0)), keep=Keep.TOP, mode=Mode.PRIVATE)
    add(chamfer4_piece_24)
    with BuildSketch(Plane(origin=(44.8, 5.45, 52), x_dir=(0, 1, 0), z_dir=(-1, 0, 0))) as chamfer4_piece_25_section:
        Polygon((1.2, CHAMFER4_SIZE), (1.2 + CHAMFER4_SIZE_2, 0), (1.2, 0), align=None)
    chamfer4_piece_25 = revolve(axis=Axis((44.8, 5.45, 52), (0, 0, -1)), revolution_arc=90, mode=Mode.PRIVATE)
    chamfer4_piece_25 = chamfer4_piece_25 & Plane(origin=(46, 6, 51.456530792), x_dir=(0, 1, 0), z_dir=(0, 0, 1)) * Cylinder(2, 13, mode=Mode.PRIVATE)
    add(chamfer4_piece_25)
    with BuildSketch(Plane(origin=(44.8, 5.45, 52), x_dir=(0, 1, 0), z_dir=(-1, 0, 0))) as chamfer4_piece_26_section:
        Polygon((1.2, CHAMFER4_SIZE), (1.2 + CHAMFER4_SIZE_2, 0), (1.2, 0), align=None)
    chamfer4_piece_26 = revolve(axis=Axis((44.8, 5.45, 52), (0, 0, -1)), revolution_arc=90, mode=Mode.PRIVATE)
    chamfer4_piece_26 = split(chamfer4_piece_26, bisect_by=Plane(origin=(46, 7.869316532, 51.773765117), z_dir=(-1, 0, 0)), keep=Keep.TOP, mode=Mode.PRIVATE)
    chamfer4_piece_26 = split(chamfer4_piece_26, bisect_by=Plane(origin=(45.067491524, 8, 51.773765117), z_dir=(0, -1, 0)), keep=Keep.TOP, mode=Mode.PRIVATE)
    add(chamfer4_piece_26)
    with BuildSketch(Plane(origin=(44.8, 5.45, 52), x_dir=(0, 1, 0), z_dir=(-1, 0, 0))) as chamfer4_piece_27_section:
        Polygon((1.2, CHAMFER4_SIZE), (1.2 + CHAMFER4_SIZE_2, 0), (1.2, 0), align=None)
    chamfer4_piece_27 = revolve(axis=Axis((44.8, 5.45, 52), (0, 0, -1)), revolution_arc=90, mode=Mode.PRIVATE)
    chamfer4_piece_27 = split(chamfer4_piece_27, bisect_by=Plane(origin=(47.968727033, 6.65, 51.984062188), z_dir=(0, -1, 0)), keep=Keep.TOP, mode=Mode.PRIVATE)
    chamfer4_piece_27 = split(chamfer4_piece_27, bisect_by=Plane(origin=(48, 5.549428522, 51.984062188), z_dir=(-1, 0, 0)), keep=Keep.TOP, mode=Mode.PRIVATE)
    add(chamfer4_piece_27)
    with BuildSketch(Plane(origin=(44.8, 5.45, 2), x_dir=(0, 1, 0), z_dir=(-1, 0, 0))) as chamfer4_piece_28_section:
        Polygon((1.2 + CHAMFER4_SIZE_2, 0), (1.2, -CHAMFER4_SIZE), (1.2, 0), align=None)
    chamfer4_piece_28 = revolve(axis=Axis((44.8, 5.45, 2), (0, 0, -1)), revolution_arc=90, mode=Mode.PRIVATE)
    chamfer4_piece_28 = split(chamfer4_piece_28, bisect_by=Plane(origin=(45.067491524, 8, 2.226234883), z_dir=(0, -1, 0)), keep=Keep.TOP, mode=Mode.PRIVATE)
    chamfer4_piece_28 = split(chamfer4_piece_28, bisect_by=Plane(origin=(46, 7.869316532, 2.226234883), z_dir=(-1, 0, 0)), keep=Keep.TOP, mode=Mode.PRIVATE)
    add(chamfer4_piece_28)
    with BuildSketch(Plane(origin=(44.8, 5.45, 2), x_dir=(0, 1, 0), z_dir=(-1, 0, 0))) as chamfer4_piece_29_section:
        Polygon((1.2 + CHAMFER4_SIZE_2, 0), (1.2, -CHAMFER4_SIZE), (1.2, 0), align=None)
    chamfer4_piece_29 = revolve(axis=Axis((44.8, 5.45, 2), (0, 0, -1)), revolution_arc=90, mode=Mode.PRIVATE)
    chamfer4_piece_29 = chamfer4_piece_29 & Plane(origin=(46, 6, 2.22929574), x_dir=(0, 1, 0), z_dir=(0, 0, 1)) * Cylinder(2, 13, mode=Mode.PRIVATE)
    add(chamfer4_piece_29)
    with BuildSketch(Plane(origin=(44.8, 5.45, 2), x_dir=(0, 1, 0), z_dir=(-1, 0, 0))) as chamfer4_piece_30_section:
        Polygon((1.2 + CHAMFER4_SIZE_2, 0), (1.2, -CHAMFER4_SIZE), (1.2, 0), align=None)
    chamfer4_piece_30 = revolve(axis=Axis((44.8, 5.45, 2), (0, 0, -1)), revolution_arc=90, mode=Mode.PRIVATE)
    chamfer4_piece_30 = split(chamfer4_piece_30, bisect_by=Plane(origin=(48, 5.549428522, 2.015937812), z_dir=(-1, 0, 0)), keep=Keep.TOP, mode=Mode.PRIVATE)
    chamfer4_piece_30 = split(chamfer4_piece_30, bisect_by=Plane(origin=(47.968727033, 6.65, 2.015937812), z_dir=(0, -1, 0)), keep=Keep.TOP, mode=Mode.PRIVATE)
    add(chamfer4_piece_30)
    with BuildSketch(Plane(origin=(46, 5.45, 52), x_dir=(-0.057893862402670714, 0, -0.9983227437537927), z_dir=(0, -1, 0))) as chamfer4_piece_31_section:
        Polygon((CHAMFER4_SIZE * 0.998322743754, CHAMFER4_SIZE * 0.0578938624027), (-CHAMFER4_SIZE_2 * 0.0578938623985, CHAMFER4_SIZE_2 * 0.998322743683), (0, 0), align=None)
    chamfer4_piece_31 = extrude(amount=2.9, mode=Mode.PRIVATE)
    chamfer4_piece_31 = split(chamfer4_piece_31, bisect_by=Plane(origin=(48, 4, 51.609934173), z_dir=(-1, 0, 0)), keep=Keep.TOP, mode=Mode.PRIVATE)
    add(chamfer4_piece_31)
    with BuildSketch(Plane(origin=(46, 5.45, 2), x_dir=(0.999813220622208, 0, -0.019326765612700657), z_dir=(0, -1, 0))) as chamfer4_piece_32_section:
        Polygon((CHAMFER4_SIZE_2 * 0.999813220551, CHAMFER4_SIZE_2 * 0.0193267656113), (-CHAMFER4_SIZE * 0.0193267656127, CHAMFER4_SIZE * 0.999813220622), (0, 0), align=None)
    chamfer4_piece_32 = extrude(amount=2.9, mode=Mode.PRIVATE)
    chamfer4_piece_32 = split(chamfer4_piece_32, bisect_by=Plane(origin=(48, 4, 2.390065827), z_dir=(-1, 0, 0)), keep=Keep.TOP, mode=Mode.PRIVATE)
    add(chamfer4_piece_32)

    # Chamfer5: one chamfer whose edges measure the first distance from different faces: ONE call of the kernel's chamfer builder (chamfer() names one face for all edges)
    chamfer5_edges_1 = [part.edges().sort_by_distance(p)[0] for p in [
        (3.6, 4, 0),
        (3.6, 4, 54),
    ]]
    chamfer5_side_1 = [part.faces().sort_by_distance(p)[0] for p in [
        (3.6, 4, 27),
    ]]
    chamfer5_edges_2 = [part.edges().sort_by_distance(p)[0] for p in [
        (24, 1.75, 0),
        (24, 1.75, 54),
    ]]
    chamfer5_side_2 = [part.faces().sort_by_distance(p)[0] for p in [
        (24, 1.75, 27),
    ]]
    chamfer5_edges_3 = [part.edges().sort_by_distance(p)[0] for p in [
        (44.4, 4, 0),
        (44.4, 4, 54),
    ]]
    chamfer5_side_3 = [part.faces().sort_by_distance(p)[0] for p in [
        (44.4, 4, 27),
    ]]
    chamfer5_edges_4 = [part.edges().sort_by_distance(p)[0] for p in [
        (24, 6.25, 0),
        (24, 6.25, 54),
    ]]
    chamfer5_side_4 = [part.faces().sort_by_distance(p)[0] for p in [
        (24, 6.25, 27),
    ]]
    chamfer5 = BRepFilletAPI_MakeChamfer(part.part.solid().wrapped)
    for e in chamfer5_edges_1:
        chamfer5.Add(CHAMFER5_SIZE, CHAMFER5_SIZE2, e.wrapped, chamfer5_side_1[0].wrapped)  # the first distance lies on this face
    for e in chamfer5_edges_2:
        chamfer5.Add(CHAMFER5_SIZE, CHAMFER5_SIZE2, e.wrapped, chamfer5_side_2[0].wrapped)  # the first distance lies on this face
    for e in chamfer5_edges_3:
        chamfer5.Add(CHAMFER5_SIZE, CHAMFER5_SIZE2, e.wrapped, chamfer5_side_3[0].wrapped)  # the first distance lies on this face
    for e in chamfer5_edges_4:
        chamfer5.Add(CHAMFER5_SIZE, CHAMFER5_SIZE2, e.wrapped, chamfer5_side_4[0].wrapped)  # the first distance lies on this face
    add(Compound.cast(chamfer5.Shape()), mode=Mode.REPLACE)


solid = part.part
